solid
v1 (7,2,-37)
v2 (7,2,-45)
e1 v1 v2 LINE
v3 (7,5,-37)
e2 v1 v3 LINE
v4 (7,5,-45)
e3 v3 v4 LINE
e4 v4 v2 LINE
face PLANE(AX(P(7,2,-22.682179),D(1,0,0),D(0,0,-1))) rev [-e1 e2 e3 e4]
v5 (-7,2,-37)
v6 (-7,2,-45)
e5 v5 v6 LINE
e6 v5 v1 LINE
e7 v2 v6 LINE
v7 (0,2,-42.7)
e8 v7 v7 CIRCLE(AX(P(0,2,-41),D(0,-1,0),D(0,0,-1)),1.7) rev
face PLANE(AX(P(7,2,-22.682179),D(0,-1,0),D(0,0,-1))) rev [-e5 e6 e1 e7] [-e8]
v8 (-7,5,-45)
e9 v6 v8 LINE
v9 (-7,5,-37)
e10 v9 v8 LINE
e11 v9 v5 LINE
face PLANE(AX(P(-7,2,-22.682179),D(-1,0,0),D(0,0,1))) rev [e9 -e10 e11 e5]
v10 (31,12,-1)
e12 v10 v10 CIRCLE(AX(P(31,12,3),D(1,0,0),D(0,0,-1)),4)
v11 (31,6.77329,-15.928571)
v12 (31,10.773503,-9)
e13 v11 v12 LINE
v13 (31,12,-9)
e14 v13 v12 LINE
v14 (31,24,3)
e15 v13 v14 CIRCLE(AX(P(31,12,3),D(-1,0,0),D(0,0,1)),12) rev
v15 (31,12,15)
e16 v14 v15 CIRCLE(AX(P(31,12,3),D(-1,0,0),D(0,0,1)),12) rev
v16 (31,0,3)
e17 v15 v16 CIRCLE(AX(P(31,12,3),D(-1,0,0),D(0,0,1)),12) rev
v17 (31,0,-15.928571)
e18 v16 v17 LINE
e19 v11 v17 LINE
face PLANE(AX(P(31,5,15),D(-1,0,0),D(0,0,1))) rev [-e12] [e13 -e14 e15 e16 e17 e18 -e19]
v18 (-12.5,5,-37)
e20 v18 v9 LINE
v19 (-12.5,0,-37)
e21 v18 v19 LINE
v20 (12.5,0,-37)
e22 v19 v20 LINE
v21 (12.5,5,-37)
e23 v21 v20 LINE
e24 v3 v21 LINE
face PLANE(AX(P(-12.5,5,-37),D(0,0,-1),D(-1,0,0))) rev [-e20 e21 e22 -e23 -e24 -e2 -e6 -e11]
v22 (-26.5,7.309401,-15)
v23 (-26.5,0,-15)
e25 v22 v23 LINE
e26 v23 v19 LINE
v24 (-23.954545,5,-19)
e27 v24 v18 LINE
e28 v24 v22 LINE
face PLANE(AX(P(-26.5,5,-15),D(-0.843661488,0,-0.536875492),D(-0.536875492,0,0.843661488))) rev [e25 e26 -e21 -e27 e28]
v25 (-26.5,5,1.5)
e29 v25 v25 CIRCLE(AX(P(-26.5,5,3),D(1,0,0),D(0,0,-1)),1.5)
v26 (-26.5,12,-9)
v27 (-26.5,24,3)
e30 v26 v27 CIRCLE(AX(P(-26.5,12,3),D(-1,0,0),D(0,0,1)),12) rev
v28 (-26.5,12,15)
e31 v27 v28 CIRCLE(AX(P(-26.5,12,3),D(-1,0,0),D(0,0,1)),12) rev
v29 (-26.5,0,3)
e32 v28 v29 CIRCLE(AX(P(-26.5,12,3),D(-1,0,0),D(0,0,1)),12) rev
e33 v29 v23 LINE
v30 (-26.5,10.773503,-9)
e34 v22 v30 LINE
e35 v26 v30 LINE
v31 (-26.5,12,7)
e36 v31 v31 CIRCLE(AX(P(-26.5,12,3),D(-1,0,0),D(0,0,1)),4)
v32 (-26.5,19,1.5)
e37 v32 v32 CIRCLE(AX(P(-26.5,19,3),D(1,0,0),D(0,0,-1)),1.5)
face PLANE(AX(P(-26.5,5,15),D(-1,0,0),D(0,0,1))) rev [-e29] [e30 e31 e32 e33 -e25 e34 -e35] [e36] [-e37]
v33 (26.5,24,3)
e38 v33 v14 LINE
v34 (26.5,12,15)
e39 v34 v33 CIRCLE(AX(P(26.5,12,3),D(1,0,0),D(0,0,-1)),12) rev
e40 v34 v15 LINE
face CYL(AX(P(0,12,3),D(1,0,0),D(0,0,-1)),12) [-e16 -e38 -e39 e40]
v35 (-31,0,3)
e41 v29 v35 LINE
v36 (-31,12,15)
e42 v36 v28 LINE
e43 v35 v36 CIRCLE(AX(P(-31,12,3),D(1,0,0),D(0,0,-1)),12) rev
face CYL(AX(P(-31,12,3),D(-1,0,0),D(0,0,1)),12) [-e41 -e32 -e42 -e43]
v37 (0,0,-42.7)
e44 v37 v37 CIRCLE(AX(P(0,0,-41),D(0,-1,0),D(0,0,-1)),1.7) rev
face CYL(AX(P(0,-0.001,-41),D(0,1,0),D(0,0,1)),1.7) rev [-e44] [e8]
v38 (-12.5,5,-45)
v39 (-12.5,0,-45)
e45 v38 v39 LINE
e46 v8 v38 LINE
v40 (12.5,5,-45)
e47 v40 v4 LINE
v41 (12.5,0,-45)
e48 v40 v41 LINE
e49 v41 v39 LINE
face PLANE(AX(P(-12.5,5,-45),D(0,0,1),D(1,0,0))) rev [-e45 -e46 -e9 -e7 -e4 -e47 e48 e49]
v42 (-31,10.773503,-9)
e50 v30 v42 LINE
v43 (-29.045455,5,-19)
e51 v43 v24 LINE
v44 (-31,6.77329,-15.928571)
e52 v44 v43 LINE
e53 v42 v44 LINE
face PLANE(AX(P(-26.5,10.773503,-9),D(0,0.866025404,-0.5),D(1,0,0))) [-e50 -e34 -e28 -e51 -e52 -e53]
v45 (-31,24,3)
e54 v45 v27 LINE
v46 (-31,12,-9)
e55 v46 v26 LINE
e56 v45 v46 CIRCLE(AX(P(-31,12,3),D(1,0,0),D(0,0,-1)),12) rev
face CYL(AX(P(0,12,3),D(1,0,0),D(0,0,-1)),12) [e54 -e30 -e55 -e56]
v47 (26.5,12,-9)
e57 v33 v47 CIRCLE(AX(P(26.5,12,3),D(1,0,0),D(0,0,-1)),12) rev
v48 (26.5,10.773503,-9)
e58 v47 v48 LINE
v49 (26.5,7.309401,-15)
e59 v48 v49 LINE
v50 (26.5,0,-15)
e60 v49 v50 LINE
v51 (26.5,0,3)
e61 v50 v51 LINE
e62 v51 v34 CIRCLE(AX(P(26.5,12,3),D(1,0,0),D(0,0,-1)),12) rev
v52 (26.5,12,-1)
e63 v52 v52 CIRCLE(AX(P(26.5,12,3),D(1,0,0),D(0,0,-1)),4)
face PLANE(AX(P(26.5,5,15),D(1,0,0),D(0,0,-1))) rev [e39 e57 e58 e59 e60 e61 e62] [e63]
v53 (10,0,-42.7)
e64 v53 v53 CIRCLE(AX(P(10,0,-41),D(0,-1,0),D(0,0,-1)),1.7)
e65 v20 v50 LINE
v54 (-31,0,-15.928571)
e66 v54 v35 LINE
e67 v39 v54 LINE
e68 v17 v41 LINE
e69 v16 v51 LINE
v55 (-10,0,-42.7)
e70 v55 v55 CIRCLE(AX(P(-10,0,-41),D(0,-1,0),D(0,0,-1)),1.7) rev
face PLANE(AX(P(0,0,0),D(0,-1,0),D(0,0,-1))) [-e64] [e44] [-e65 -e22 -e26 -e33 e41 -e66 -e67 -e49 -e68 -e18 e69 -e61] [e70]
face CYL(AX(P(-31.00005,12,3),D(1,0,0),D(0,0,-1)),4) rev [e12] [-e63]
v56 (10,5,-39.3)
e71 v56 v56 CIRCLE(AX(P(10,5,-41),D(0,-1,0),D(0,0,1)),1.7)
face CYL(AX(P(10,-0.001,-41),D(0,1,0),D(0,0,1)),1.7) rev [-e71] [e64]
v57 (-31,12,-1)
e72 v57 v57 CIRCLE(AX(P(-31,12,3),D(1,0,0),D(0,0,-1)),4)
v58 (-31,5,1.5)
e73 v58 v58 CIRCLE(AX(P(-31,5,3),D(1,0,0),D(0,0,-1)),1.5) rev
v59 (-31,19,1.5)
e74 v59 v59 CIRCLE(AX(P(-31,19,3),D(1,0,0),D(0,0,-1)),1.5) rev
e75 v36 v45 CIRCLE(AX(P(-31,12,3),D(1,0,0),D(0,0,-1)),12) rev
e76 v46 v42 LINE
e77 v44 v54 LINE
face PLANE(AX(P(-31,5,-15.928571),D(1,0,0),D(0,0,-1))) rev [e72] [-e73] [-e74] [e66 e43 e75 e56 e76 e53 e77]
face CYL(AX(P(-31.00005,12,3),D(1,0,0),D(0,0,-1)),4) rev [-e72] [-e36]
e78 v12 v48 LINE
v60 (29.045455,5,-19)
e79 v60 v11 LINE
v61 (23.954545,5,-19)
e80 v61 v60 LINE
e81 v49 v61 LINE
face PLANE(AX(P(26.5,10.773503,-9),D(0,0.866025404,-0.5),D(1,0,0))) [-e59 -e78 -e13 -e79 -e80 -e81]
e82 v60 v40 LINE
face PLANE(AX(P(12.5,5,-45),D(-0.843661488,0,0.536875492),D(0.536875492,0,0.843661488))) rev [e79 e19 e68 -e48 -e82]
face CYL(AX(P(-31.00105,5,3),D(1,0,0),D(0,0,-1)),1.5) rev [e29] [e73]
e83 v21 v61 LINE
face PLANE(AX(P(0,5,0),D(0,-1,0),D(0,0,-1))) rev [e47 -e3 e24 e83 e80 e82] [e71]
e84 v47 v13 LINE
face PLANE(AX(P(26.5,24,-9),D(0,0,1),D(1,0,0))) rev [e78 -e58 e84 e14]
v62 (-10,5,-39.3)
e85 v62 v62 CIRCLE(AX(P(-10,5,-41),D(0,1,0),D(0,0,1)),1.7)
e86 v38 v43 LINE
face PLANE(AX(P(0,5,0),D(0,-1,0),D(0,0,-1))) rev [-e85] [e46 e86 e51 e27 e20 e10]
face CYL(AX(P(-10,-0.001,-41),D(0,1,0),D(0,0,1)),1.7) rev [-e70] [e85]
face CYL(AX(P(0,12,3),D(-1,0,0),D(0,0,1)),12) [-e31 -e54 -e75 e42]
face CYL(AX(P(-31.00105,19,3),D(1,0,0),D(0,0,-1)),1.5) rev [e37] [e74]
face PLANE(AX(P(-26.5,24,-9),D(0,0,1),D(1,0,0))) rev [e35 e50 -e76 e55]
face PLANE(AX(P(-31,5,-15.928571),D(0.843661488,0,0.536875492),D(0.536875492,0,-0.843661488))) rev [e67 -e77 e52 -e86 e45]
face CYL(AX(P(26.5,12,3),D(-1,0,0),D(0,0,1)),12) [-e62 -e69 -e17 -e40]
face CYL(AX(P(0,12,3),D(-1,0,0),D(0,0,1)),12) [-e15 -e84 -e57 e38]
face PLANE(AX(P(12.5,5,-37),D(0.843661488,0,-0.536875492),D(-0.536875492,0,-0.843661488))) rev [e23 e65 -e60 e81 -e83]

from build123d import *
from OCP.BRepFilletAPI import BRepFilletAPI_MakeChamfer

# Parameters (mm, degrees)
BOSS_EXTRUDE1_DEPTH     = 5
SKETCH2_W               = 4.5
SKETCH2_H               = 24
BOSS_EXTRUDE2_DEPTH     = 19
CUT_EXTRUDE1_REACH      = 59.853
SKETCH5_R               = 1.7
CUT_EXTRUDE2_REACH      = 73.673
SKETCH6_W               = 14
SKETCH6_H               = 3
CUT_EXTRUDE3_REACH      = 78.859
SKETCH7_R               = 1.5
CUT_EXTRUDE4_DEPTH      = 77.85863647
CUT_EXTRUDE4_DEPTH_BACK = 77.85863647
SKETCH8_R               = 4
FILLET1_R               = 12
CHAMFER2_SIZE           = 10
CHAMFER2_SIZE2          = 5.773502692
CUT_EXTRUDE5_REACH      = 59.853
SKETCH10_R              = 1.7


with BuildPart() as part:
    # Sketch1 → Boss-Extrude1 (new body)
    with BuildSketch(Plane(origin=(0, 0, 0), x_dir=(1, 0, 0), z_dir=(0, 1, 0))):
        Polygon((-31, 15.928571429), (-31, -15), (-26.5, -15), (-26.5, 15), (-12.5, 37), (12.5, 37), (26.5, 15), (26.5, -15), (31, -15), (31, 15.928571429), (12.5, 45), (-12.5, 45), align=None)
    extrude(amount=BOSS_EXTRUDE1_DEPTH)

    # Sketch2 → Boss-Extrude2 (add)
    with BuildSketch(Plane(origin=(0, 5, 0), x_dir=(1, 0, 0), z_dir=(0, 1, 0))):
        with Locations((-28.75, -3)):
            Rectangle(SKETCH2_W, SKETCH2_H)
        with Locations((28.75, -3)):
            Rectangle(SKETCH2_W, SKETCH2_H)
    extrude(amount=BOSS_EXTRUDE2_DEPTH)

    # Sketch5 → Cut-Extrude1 (cut, up to next)
    with BuildSketch(Plane(origin=(0, 5, 0), x_dir=(1, 0, 0), z_dir=(0, 1, 0)), mode=Mode.PRIVATE) as cut_extrude1_sk1:
        with Locations(Location((0, 41, 0), (0, 0, 270))):
            Circle(SKETCH5_R)
    cut_extrude1_tool1 = extrude(cut_extrude1_sk1.sketch, amount=-CUT_EXTRUDE1_REACH, mode=Mode.PRIVATE) & part.part
    add(cut_extrude1_tool1.solids().sort_by_distance((0, 5, -41))[0], mode=Mode.SUBTRACT)

    # Cut-Extrude2: up to this face of the body (flat: up to its plane)
    cut_extrude2_end = Plane(part.part.faces().sort_by_distance((0, 2.5, -37))[0])
    # Sketch6 → Cut-Extrude2 (cut, up to the picked face)
    with BuildSketch(Plane(origin=(0, 0, -45), x_dir=(-1, 0, 0), z_dir=(0, 0, -1)), mode=Mode.PRIVATE) as cut_extrude2_sk1:
        with Locations((0, 3.5)):
            Rectangle(SKETCH6_W, SKETCH6_H)
    cut_extrude2_tool1 = split(extrude(cut_extrude2_sk1.sketch, amount=-CUT_EXTRUDE2_REACH, mode=Mode.PRIVATE), bisect_by=cut_extrude2_end, keep=Keep.BOTH, mode=Mode.PRIVATE)
    add(cut_extrude2_tool1.solids().sort_by(Axis((0, 3.5, -45), (0, 0, 1)))[0], mode=Mode.SUBTRACT)

    # Sketch7 → Cut-Extrude3 (cut, up to next)
    with BuildSketch(Plane(origin=(-26.5, 0, 0), x_dir=(0, 0, -1), z_dir=(1, 0, 0)), mode=Mode.PRIVATE) as cut_extrude3_sk1:
        with Locations((-3, 19)):
            Circle(SKETCH7_R)
    cut_extrude3_tool1 = extrude(cut_extrude3_sk1.sketch, amount=-CUT_EXTRUDE3_REACH, mode=Mode.PRIVATE) & part.part
    # Sketch7 → Cut-Extrude3 (cut, up to next)
    with BuildSketch(Plane(origin=(-26.5, 0, 0), x_dir=(0, 0, -1), z_dir=(1, 0, 0)), mode=Mode.PRIVATE) as cut_extrude3_sk2:
        with Locations((-3, 5)):
            Circle(SKETCH7_R)
    cut_extrude3_tool2 = extrude(cut_extrude3_sk2.sketch, amount=-CUT_EXTRUDE3_REACH, mode=Mode.PRIVATE) & part.part
    add(cut_extrude3_tool1.solids().sort_by_distance((-26.5, 19, 3))[0], mode=Mode.SUBTRACT)
    add(cut_extrude3_tool2.solids().sort_by_distance((-26.5, 5, 3))[0], mode=Mode.SUBTRACT)

    # Sketch8 → Cut-Extrude4 (cut, two sides: drawn at the far end of the back side and taken through both)
    with BuildSketch(Plane(origin=(-26.5, 0, 0), x_dir=(0, 0, -1), z_dir=(1, 0, 0)).offset(-CUT_EXTRUDE4_DEPTH_BACK)):
        with Locations((-3, 12)):
            Circle(SKETCH8_R)
    extrude(amount=CUT_EXTRUDE4_DEPTH + CUT_EXTRUDE4_DEPTH_BACK, mode=Mode.SUBTRACT)

    # Fillet1
    fillet1_edges = [part.edges().sort_by_distance(p)[0] for p in [
        (28.75, 0, 15),
        (-28.75, 0, 15),
        (-28.75, 24, -9),
        (28.75, 24, -9),
        (28.75, 24, 15),
        (-28.75, 24, 15),
    ]]
    fillet(fillet1_edges, radius=FILLET1_R - 0.0001)  # a hair under: the kernel refuses the full size

    # Chamfer2: one chamfer whose edges measure the first distance from different faces: ONE call of the kernel's chamfer builder (chamfer() names one face for all edges)
    chamfer2_edges_1 = [part.edges().sort_by_distance(p)[0] for p in [
        (-28.75, 5, -9),
    ]]
    chamfer2_side_1 = [part.faces().sort_by_distance(p)[0] for p in [
        (-19.473621736, 5, -28.773341624),
    ]]
    chamfer2_edges_2 = [part.edges().sort_by_distance(p)[0] for p in [
        (28.75, 5, -9),
    ]]
    chamfer2_side_2 = [part.faces().sort_by_distance(p)[0] for p in [
        (19.473621736, 5, -28.773341624),
    ]]
    chamfer2 = BRepFilletAPI_MakeChamfer(part.part.solid().wrapped)
    for e in chamfer2_edges_1:
        chamfer2.Add(CHAMFER2_SIZE, CHAMFER2_SIZE2, e.wrapped, chamfer2_side_1[0].wrapped)  # the first distance lies on this face
    for e in chamfer2_edges_2:
        chamfer2.Add(CHAMFER2_SIZE, CHAMFER2_SIZE2, e.wrapped, chamfer2_side_2[0].wrapped)  # the first distance lies on this face
    add(Compound.cast(chamfer2.Shape()), mode=Mode.REPLACE)

    # Sketch10 → Cut-Extrude5 (cut, up to next)
    with BuildSketch(Plane(origin=(0, 5, 0), x_dir=(1, 0, 0), z_dir=(0, 1, 0)), mode=Mode.PRIVATE) as cut_extrude5_sk1:
        with Locations(Location((-10, 41, 0), (0, 0, 270))):
            Circle(SKETCH10_R)
    cut_extrude5_tool1 = extrude(cut_extrude5_sk1.sketch, amount=-CUT_EXTRUDE5_REACH, mode=Mode.PRIVATE) & part.part
    cut_extrude5 = cut_extrude5_tool1.solids().sort_by_distance((-10, 5, -41))[0]
    add(cut_extrude5, mode=Mode.SUBTRACT)

    # Mirror1: Cut-Extrude5 across plane
    add(cut_extrude5.mirror(Plane(origin=(0, 0, 0), x_dir=(0, 0, 1), z_dir=(1, 0, 0))), mode=Mode.SUBTRACT)


solid = part.part
